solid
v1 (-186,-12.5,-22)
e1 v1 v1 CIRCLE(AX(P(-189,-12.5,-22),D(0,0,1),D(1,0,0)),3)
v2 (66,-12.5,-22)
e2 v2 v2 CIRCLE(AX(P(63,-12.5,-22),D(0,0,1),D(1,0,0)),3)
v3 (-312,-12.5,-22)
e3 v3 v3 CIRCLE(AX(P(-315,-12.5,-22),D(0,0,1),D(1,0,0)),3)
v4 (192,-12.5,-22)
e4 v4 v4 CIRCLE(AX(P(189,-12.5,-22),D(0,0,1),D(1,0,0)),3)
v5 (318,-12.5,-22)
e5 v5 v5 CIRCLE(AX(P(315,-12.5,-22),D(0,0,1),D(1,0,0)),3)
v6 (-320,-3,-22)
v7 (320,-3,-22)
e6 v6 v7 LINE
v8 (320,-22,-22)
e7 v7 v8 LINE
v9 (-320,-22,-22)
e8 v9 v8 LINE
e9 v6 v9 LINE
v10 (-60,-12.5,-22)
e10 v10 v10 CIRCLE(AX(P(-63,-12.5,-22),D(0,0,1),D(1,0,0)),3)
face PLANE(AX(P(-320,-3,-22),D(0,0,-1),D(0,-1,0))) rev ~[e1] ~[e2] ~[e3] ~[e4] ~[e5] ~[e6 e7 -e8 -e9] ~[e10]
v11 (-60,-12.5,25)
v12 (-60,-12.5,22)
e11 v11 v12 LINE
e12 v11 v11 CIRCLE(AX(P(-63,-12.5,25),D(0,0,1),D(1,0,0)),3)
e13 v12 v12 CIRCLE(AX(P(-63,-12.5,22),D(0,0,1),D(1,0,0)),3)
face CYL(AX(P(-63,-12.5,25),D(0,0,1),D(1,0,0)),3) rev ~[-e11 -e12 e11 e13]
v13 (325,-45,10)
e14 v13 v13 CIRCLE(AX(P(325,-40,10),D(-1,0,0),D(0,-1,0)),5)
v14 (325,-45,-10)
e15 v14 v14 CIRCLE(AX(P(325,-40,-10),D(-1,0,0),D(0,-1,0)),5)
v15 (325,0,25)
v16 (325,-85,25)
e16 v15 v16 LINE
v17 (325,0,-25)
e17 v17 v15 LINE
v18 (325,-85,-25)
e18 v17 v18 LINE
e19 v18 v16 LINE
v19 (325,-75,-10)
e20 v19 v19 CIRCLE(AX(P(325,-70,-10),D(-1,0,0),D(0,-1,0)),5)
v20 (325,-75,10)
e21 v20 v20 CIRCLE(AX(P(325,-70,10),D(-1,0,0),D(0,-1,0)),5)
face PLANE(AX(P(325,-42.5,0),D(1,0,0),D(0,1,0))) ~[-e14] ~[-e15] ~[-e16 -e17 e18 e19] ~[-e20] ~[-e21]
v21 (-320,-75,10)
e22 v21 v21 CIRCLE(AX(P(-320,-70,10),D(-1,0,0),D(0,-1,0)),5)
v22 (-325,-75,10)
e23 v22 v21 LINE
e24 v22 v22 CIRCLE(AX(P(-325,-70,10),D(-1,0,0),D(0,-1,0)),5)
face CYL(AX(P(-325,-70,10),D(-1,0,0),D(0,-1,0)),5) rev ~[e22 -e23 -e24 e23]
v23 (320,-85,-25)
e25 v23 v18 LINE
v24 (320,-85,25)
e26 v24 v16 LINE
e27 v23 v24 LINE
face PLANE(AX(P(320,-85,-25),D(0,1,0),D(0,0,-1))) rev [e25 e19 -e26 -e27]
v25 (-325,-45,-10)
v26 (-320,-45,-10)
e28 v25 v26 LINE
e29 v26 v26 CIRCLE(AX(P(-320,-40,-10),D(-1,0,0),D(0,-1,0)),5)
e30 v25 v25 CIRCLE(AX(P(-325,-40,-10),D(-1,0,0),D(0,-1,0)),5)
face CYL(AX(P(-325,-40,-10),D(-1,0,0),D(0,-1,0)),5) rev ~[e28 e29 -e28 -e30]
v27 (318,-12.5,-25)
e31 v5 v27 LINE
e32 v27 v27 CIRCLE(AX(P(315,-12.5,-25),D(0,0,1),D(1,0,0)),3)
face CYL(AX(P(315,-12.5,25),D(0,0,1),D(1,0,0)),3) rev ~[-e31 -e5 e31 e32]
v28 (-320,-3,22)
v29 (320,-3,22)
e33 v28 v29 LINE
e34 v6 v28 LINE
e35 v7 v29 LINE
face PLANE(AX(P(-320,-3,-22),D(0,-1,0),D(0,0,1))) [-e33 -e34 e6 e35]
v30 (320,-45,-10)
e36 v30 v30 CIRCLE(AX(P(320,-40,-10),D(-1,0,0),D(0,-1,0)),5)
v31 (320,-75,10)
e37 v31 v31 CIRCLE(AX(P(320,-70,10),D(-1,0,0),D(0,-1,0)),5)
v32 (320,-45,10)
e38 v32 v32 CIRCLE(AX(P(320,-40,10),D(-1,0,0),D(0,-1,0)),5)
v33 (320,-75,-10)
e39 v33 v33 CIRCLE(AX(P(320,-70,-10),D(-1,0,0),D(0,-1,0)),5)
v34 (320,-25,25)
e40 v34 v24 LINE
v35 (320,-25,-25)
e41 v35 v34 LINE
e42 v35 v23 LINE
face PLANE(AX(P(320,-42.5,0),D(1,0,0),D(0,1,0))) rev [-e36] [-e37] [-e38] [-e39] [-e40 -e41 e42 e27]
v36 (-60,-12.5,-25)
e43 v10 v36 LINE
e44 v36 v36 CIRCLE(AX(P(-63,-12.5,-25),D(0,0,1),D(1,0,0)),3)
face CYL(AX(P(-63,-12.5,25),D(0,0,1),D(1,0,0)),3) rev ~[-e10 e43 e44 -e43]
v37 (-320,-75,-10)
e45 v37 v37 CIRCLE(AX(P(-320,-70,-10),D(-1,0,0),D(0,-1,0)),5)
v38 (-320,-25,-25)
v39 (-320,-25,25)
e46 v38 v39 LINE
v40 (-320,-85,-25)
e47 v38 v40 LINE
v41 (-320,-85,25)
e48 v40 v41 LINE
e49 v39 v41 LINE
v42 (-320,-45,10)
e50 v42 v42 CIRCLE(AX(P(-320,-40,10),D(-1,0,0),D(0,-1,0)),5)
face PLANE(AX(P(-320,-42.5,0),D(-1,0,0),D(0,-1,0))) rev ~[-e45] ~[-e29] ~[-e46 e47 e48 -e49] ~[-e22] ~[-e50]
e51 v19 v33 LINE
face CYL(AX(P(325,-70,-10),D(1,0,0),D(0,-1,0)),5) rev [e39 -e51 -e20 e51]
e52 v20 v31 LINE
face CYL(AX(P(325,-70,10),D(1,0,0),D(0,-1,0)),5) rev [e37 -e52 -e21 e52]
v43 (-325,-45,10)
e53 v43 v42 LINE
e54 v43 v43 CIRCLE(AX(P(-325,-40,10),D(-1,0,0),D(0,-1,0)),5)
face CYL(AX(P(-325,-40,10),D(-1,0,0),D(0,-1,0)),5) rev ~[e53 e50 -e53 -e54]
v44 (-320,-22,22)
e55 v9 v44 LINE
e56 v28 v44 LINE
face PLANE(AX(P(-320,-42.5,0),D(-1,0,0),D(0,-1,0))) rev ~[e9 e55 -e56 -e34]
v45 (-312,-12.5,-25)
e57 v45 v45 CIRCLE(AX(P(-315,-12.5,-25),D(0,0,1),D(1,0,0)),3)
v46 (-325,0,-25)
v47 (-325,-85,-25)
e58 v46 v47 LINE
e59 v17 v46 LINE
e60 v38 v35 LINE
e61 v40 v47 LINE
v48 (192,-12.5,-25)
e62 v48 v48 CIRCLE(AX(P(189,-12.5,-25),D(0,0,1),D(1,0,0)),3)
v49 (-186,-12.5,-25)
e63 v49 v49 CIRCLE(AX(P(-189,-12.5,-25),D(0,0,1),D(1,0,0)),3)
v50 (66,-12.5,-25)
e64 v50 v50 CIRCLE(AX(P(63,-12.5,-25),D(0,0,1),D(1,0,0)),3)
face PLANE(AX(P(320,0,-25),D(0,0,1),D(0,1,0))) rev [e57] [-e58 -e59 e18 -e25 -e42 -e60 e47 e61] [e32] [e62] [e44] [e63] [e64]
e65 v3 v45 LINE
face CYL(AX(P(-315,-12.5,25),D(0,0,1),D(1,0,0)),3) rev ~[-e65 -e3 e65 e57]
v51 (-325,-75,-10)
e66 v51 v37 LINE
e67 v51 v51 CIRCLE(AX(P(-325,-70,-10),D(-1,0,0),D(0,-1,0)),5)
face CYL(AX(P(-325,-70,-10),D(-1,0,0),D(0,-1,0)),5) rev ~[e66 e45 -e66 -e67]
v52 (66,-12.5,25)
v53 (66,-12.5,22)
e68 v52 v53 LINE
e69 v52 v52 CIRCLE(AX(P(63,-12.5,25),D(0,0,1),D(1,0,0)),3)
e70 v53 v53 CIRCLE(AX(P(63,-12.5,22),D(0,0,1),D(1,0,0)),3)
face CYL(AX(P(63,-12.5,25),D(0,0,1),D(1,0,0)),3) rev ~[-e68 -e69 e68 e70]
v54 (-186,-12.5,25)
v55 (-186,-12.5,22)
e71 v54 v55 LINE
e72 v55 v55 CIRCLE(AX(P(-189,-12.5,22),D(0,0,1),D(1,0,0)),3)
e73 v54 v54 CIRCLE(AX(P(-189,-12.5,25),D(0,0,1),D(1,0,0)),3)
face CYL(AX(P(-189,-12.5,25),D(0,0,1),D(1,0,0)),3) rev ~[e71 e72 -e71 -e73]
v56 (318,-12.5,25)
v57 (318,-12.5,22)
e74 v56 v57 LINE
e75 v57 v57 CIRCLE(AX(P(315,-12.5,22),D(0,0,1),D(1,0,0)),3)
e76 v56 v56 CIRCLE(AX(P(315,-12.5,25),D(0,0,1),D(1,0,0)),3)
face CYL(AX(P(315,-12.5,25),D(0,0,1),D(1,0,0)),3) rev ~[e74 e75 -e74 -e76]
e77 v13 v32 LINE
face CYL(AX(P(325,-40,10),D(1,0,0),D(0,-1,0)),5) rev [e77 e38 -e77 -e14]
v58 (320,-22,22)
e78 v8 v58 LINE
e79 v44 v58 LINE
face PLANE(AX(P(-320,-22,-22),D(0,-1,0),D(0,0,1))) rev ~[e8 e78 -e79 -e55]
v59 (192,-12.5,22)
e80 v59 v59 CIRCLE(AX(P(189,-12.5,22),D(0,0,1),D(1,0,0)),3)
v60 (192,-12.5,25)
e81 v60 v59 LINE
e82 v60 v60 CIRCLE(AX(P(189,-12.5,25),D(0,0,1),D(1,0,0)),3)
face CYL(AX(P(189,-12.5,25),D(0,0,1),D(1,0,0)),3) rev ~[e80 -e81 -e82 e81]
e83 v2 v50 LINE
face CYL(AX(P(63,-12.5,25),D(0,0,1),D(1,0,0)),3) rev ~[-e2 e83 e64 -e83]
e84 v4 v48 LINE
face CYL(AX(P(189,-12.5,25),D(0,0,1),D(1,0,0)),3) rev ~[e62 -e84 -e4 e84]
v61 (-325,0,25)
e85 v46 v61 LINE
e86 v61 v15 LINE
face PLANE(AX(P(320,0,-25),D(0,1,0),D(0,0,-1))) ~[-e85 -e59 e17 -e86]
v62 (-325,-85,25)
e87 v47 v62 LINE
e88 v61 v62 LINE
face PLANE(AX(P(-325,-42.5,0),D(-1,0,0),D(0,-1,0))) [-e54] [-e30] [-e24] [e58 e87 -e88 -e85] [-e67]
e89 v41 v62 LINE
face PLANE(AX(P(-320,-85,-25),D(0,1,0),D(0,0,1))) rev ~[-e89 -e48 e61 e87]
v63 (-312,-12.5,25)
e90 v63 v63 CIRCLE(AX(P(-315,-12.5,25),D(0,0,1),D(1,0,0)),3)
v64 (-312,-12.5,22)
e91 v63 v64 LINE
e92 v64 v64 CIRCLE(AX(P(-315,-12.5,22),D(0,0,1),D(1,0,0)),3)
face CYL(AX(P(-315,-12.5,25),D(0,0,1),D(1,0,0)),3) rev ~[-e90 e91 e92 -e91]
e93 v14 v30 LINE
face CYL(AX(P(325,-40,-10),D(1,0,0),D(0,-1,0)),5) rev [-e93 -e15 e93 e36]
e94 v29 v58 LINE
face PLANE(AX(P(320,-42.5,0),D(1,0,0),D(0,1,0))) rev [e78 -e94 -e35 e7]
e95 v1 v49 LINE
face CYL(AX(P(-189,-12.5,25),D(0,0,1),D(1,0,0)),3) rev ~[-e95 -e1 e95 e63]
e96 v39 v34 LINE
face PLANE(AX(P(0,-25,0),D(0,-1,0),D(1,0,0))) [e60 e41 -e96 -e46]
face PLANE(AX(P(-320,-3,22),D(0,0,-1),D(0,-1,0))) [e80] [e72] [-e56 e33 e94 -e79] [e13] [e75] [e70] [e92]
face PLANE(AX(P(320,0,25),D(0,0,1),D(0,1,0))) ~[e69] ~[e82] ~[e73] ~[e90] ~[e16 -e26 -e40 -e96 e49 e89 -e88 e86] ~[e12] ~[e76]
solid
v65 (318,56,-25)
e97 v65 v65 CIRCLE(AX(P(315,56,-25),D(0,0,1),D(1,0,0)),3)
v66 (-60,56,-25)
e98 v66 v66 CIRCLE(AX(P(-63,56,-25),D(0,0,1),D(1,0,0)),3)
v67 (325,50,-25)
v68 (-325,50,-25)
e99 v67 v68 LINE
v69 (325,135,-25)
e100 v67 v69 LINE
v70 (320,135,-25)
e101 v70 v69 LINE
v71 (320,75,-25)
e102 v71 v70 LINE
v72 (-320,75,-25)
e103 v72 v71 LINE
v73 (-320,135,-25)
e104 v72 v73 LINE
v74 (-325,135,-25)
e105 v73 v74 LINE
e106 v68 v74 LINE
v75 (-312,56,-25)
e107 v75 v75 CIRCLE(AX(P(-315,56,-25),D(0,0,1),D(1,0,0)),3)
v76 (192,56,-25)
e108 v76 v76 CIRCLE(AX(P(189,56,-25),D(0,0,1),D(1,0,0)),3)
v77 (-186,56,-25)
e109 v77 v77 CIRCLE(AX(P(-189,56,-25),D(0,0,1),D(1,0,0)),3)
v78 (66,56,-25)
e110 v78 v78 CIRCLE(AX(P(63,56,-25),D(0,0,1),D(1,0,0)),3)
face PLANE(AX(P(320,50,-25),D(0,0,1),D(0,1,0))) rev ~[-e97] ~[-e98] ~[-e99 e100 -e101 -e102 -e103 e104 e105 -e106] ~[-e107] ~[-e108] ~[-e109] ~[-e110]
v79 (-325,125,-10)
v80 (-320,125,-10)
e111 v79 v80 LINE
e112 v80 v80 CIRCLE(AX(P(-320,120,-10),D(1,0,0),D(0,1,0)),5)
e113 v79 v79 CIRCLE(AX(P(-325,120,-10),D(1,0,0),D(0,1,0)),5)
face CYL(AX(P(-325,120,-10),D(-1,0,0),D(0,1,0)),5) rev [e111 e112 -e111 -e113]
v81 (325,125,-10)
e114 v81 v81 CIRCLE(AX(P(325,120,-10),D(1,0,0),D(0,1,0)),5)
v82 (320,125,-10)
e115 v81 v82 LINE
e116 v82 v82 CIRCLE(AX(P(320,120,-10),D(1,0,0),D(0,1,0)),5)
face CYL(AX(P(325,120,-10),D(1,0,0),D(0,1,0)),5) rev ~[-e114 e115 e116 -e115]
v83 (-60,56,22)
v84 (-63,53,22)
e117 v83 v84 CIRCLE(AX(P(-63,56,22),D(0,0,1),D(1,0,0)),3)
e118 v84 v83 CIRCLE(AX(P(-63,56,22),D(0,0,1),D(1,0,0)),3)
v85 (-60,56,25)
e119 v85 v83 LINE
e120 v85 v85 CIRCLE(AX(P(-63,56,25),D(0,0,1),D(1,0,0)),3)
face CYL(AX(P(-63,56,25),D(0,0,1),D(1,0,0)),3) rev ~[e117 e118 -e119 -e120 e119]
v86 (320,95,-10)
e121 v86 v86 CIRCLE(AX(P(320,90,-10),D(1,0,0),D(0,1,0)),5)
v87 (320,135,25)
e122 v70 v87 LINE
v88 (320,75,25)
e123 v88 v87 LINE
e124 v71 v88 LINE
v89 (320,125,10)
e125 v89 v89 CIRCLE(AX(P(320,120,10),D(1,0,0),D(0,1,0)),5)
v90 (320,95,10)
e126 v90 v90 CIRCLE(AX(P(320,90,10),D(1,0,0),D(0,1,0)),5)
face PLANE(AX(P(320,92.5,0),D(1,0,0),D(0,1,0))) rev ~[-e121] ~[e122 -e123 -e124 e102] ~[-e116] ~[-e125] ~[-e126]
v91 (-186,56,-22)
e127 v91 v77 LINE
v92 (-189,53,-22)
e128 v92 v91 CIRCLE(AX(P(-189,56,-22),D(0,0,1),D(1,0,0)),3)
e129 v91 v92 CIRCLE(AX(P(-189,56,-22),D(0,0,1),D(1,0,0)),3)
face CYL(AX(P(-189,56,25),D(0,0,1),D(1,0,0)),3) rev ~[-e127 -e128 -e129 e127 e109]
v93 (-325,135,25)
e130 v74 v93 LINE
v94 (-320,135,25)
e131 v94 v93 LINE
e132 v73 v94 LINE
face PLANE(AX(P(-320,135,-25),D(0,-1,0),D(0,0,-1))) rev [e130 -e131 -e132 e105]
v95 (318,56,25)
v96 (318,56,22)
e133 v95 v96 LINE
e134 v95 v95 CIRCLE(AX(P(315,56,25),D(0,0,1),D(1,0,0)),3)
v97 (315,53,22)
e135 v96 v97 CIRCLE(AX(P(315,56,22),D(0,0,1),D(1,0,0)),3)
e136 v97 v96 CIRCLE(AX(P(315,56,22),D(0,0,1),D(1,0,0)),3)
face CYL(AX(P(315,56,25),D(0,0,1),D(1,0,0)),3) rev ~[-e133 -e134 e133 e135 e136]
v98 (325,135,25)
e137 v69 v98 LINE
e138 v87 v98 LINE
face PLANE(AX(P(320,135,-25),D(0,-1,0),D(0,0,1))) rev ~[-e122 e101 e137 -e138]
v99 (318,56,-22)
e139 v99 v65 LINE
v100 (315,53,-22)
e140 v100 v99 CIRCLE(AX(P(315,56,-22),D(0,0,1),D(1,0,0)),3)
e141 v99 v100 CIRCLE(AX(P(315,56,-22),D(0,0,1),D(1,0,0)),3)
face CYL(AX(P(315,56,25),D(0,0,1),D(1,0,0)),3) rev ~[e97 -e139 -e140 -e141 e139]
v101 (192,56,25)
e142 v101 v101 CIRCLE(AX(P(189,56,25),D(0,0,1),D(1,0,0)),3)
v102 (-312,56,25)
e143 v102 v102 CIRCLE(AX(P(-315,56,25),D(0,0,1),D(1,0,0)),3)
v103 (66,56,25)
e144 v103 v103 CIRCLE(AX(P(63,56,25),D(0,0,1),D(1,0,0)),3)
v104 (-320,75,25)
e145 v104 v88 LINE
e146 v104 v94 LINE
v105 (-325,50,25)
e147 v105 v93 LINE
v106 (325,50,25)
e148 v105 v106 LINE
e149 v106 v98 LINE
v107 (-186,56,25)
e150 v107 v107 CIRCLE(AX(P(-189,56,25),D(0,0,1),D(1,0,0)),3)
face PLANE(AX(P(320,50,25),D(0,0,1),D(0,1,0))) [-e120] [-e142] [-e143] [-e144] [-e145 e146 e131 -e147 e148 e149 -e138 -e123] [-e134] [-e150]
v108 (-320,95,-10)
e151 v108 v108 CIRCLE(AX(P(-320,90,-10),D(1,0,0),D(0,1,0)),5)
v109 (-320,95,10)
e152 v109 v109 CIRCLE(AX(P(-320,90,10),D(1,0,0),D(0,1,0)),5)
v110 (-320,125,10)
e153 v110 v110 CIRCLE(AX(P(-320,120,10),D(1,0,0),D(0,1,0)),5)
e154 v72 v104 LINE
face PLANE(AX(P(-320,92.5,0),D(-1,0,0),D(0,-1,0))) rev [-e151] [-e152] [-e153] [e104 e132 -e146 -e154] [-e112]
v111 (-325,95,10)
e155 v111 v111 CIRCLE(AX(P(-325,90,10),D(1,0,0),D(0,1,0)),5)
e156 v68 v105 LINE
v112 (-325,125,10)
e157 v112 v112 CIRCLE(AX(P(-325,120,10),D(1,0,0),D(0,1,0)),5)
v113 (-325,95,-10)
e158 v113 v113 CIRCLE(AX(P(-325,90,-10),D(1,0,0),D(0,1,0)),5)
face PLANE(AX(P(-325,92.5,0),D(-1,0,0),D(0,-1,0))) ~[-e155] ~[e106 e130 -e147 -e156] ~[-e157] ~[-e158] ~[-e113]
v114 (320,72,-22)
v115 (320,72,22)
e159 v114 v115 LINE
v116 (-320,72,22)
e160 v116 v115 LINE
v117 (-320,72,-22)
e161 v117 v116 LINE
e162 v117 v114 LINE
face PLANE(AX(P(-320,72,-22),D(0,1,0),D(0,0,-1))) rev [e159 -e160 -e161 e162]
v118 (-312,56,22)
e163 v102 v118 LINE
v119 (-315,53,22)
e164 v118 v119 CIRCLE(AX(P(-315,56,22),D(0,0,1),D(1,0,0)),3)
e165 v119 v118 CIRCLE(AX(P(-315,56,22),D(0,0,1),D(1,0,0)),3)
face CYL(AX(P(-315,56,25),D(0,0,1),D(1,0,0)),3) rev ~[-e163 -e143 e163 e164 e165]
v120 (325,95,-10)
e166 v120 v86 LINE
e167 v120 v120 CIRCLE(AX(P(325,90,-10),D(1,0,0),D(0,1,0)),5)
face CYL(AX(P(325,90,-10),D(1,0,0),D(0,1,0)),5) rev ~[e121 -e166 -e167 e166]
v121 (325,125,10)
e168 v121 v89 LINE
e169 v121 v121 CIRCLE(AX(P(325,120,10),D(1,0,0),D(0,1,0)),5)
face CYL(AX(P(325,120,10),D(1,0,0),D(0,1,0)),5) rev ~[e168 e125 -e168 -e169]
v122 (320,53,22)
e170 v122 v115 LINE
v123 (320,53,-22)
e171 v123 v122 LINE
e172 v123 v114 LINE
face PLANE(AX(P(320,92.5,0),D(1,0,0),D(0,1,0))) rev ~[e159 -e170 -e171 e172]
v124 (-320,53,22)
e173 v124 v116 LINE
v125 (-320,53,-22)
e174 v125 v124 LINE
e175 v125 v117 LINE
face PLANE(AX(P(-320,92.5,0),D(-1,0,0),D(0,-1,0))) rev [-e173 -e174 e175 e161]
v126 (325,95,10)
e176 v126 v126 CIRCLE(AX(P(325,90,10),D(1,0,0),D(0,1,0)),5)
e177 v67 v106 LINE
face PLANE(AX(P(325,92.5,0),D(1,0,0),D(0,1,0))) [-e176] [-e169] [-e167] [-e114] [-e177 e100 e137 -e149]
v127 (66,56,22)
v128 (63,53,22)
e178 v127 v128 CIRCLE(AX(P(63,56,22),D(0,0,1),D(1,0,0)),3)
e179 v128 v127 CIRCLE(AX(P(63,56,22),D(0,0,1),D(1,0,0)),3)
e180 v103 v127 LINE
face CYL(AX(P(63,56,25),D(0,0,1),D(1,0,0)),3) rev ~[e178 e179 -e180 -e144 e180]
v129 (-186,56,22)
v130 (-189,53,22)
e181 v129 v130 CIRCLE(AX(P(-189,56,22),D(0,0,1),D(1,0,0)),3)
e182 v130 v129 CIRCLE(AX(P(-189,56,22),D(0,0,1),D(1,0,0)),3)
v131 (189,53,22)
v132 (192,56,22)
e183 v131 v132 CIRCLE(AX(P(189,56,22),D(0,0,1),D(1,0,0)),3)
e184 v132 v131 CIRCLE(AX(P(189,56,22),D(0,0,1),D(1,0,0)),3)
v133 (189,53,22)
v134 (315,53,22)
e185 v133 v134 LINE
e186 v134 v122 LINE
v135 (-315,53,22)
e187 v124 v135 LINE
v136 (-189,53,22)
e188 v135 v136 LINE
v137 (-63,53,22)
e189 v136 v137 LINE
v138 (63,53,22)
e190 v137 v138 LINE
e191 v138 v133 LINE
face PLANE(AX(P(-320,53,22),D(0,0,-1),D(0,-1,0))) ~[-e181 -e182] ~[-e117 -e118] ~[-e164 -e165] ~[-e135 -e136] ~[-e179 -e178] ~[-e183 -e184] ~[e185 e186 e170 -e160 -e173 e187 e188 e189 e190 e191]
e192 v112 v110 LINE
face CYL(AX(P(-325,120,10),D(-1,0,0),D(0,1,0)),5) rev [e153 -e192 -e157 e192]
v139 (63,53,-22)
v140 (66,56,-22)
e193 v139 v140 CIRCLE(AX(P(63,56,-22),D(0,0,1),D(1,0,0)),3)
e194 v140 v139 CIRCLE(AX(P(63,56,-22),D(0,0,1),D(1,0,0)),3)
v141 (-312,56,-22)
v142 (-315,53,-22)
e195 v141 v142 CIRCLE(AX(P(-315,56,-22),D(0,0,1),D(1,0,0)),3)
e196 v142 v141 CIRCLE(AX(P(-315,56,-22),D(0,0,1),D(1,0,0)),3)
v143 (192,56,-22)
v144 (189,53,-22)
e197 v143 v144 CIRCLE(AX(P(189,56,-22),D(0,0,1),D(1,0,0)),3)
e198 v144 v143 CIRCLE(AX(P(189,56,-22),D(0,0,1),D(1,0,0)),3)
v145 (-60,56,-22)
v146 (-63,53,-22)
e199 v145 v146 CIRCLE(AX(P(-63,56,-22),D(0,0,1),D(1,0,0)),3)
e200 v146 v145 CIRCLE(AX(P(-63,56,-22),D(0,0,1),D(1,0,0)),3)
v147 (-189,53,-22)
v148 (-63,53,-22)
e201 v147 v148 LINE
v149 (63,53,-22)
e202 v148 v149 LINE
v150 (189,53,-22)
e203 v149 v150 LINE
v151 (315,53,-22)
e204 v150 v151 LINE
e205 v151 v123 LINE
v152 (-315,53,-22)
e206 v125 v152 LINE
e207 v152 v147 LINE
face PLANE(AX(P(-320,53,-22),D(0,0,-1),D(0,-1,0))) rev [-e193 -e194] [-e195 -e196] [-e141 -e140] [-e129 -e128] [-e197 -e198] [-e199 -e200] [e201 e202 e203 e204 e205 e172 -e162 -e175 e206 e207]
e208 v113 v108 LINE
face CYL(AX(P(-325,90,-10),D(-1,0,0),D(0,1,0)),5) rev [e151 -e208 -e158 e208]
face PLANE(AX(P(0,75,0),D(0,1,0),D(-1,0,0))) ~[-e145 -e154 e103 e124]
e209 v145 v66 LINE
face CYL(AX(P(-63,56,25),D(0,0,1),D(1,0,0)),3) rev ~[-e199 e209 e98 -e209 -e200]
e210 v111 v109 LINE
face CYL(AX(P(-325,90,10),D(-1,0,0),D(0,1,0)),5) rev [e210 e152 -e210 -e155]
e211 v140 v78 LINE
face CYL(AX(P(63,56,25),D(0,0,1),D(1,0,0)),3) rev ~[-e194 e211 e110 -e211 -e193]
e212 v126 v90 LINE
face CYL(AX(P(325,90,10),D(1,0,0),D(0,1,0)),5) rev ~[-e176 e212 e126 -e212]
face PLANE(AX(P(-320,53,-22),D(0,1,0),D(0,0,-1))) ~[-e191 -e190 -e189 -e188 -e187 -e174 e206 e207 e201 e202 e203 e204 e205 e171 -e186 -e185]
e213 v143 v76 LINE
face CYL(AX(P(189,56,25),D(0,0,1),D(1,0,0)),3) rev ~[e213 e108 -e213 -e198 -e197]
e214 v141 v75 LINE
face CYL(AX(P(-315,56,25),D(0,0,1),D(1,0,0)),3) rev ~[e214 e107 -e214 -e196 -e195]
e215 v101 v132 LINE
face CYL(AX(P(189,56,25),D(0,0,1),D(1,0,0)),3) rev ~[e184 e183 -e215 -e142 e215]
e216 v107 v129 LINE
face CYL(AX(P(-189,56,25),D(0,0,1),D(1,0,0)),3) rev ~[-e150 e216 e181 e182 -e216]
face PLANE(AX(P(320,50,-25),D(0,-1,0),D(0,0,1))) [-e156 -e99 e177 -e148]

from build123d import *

# Parameters (mm, degrees)
F0_W      = 640
F0_H      = 50
F1_DEPTH  = 25
F2_W      = 19
F2_H      = 44
F3_DEPTH  = 1130
F4_W      = 85
F4_H      = 50
F5_DEPTH  = 5
F6_R      = 5
F7_DEPTH  = 5
F10_R     = 3
F11_DEPTH = 50
F12_R     = 3
F13_DEPTH = 50


# Not quite as in the source:
# - a pattern or mirror of a feature is missing from the dataset's text; its kind, count and spacing are read off the source's solid


with BuildPart() as f1:
    # F0 (on Front) → F1 (new body)
    with BuildSketch(Plane.XZ):
        Rectangle(F0_W, F0_H)
    extrude(amount=F1_DEPTH)

    # F2 (on face) → F3 (cut)
    with BuildSketch(Plane(origin=(-320, 0, 0), x_dir=(0, -1, 0), z_dir=(-1, 0, 0))):
        with Locations((12.5, 0)):
            Rectangle(F2_W, F2_H)
    extrude(amount=-F3_DEPTH, mode=Mode.SUBTRACT)

    # F4 (on face) → F5 (join)
    with BuildSketch(Plane(origin=(-320, 0, 0), x_dir=(0, -1, 0), z_dir=(-1, 0, 0))):
        with Locations((42.5, 0)):
            Rectangle(F4_W, F4_H)
    f5 = extrude(amount=F5_DEPTH)

    # F5_copies: F5 across plane
    add(f5.mirror(Plane(origin=(0, 0, 0), x_dir=(0, 0, 1), z_dir=(1, 0, 0))))

    # F6 (on face) → F7 (cut)
    with BuildSketch(Plane(origin=(-325, 0, 0), x_dir=(0, -1, 0), z_dir=(-1, 0, 0))):
        with Locations((40, -10)):
            Circle(F6_R)
        with Locations((40, 10)):
            Circle(F6_R)
        with Locations((70, 10)):
            Circle(F6_R)
        with Locations((70, -10)):
            Circle(F6_R)
    f7 = extrude(amount=-F7_DEPTH, mode=Mode.SUBTRACT)

    # F7_copies: F7 across plane
    add(f7.mirror(Plane(origin=(0, 0, 0), x_dir=(0, 0, 1), z_dir=(1, 0, 0))), mode=Mode.SUBTRACT)


with BuildPart() as f9_1:
    # F9: instance of F1
    add(f1.part.mirror(Plane.XZ.offset(-25)))

    # F12 (on face) → F13 (cut)
    with BuildSketch(Plane.XY.offset(25)):
        with Locations((-315, 56)):
            Circle(F12_R)
        with Locations((-189, 56)):
            Circle(F12_R)
        with Locations((-63, 56)):
            Circle(F12_R)
        with Locations((63, 56)):
            Circle(F12_R)
        with Locations((189, 56)):
            Circle(F12_R)
        with Locations((315, 56)):
            Circle(F12_R)
    extrude(amount=-F13_DEPTH, mode=Mode.SUBTRACT)


with BuildPart() as f1_1:
    add(f1.part)

    # F10 (on face) → F11 (cut)
    with BuildSketch(Plane.XY.offset(25)):
        with Locations((-315, -12.5)):
            Circle(F10_R)
        with Locations((-189, -12.5)):
            Circle(F10_R)
        with Locations((-63, -12.5)):
            Circle(F10_R)
        with Locations((63, -12.5)):
            Circle(F10_R)
        with Locations((189, -12.5)):
            Circle(F10_R)
        with Locations((315, -12.5)):
            Circle(F10_R)
    extrude(amount=-F11_DEPTH, mode=Mode.SUBTRACT)


solid = Compound([f9_1.part, f1_1.part])
